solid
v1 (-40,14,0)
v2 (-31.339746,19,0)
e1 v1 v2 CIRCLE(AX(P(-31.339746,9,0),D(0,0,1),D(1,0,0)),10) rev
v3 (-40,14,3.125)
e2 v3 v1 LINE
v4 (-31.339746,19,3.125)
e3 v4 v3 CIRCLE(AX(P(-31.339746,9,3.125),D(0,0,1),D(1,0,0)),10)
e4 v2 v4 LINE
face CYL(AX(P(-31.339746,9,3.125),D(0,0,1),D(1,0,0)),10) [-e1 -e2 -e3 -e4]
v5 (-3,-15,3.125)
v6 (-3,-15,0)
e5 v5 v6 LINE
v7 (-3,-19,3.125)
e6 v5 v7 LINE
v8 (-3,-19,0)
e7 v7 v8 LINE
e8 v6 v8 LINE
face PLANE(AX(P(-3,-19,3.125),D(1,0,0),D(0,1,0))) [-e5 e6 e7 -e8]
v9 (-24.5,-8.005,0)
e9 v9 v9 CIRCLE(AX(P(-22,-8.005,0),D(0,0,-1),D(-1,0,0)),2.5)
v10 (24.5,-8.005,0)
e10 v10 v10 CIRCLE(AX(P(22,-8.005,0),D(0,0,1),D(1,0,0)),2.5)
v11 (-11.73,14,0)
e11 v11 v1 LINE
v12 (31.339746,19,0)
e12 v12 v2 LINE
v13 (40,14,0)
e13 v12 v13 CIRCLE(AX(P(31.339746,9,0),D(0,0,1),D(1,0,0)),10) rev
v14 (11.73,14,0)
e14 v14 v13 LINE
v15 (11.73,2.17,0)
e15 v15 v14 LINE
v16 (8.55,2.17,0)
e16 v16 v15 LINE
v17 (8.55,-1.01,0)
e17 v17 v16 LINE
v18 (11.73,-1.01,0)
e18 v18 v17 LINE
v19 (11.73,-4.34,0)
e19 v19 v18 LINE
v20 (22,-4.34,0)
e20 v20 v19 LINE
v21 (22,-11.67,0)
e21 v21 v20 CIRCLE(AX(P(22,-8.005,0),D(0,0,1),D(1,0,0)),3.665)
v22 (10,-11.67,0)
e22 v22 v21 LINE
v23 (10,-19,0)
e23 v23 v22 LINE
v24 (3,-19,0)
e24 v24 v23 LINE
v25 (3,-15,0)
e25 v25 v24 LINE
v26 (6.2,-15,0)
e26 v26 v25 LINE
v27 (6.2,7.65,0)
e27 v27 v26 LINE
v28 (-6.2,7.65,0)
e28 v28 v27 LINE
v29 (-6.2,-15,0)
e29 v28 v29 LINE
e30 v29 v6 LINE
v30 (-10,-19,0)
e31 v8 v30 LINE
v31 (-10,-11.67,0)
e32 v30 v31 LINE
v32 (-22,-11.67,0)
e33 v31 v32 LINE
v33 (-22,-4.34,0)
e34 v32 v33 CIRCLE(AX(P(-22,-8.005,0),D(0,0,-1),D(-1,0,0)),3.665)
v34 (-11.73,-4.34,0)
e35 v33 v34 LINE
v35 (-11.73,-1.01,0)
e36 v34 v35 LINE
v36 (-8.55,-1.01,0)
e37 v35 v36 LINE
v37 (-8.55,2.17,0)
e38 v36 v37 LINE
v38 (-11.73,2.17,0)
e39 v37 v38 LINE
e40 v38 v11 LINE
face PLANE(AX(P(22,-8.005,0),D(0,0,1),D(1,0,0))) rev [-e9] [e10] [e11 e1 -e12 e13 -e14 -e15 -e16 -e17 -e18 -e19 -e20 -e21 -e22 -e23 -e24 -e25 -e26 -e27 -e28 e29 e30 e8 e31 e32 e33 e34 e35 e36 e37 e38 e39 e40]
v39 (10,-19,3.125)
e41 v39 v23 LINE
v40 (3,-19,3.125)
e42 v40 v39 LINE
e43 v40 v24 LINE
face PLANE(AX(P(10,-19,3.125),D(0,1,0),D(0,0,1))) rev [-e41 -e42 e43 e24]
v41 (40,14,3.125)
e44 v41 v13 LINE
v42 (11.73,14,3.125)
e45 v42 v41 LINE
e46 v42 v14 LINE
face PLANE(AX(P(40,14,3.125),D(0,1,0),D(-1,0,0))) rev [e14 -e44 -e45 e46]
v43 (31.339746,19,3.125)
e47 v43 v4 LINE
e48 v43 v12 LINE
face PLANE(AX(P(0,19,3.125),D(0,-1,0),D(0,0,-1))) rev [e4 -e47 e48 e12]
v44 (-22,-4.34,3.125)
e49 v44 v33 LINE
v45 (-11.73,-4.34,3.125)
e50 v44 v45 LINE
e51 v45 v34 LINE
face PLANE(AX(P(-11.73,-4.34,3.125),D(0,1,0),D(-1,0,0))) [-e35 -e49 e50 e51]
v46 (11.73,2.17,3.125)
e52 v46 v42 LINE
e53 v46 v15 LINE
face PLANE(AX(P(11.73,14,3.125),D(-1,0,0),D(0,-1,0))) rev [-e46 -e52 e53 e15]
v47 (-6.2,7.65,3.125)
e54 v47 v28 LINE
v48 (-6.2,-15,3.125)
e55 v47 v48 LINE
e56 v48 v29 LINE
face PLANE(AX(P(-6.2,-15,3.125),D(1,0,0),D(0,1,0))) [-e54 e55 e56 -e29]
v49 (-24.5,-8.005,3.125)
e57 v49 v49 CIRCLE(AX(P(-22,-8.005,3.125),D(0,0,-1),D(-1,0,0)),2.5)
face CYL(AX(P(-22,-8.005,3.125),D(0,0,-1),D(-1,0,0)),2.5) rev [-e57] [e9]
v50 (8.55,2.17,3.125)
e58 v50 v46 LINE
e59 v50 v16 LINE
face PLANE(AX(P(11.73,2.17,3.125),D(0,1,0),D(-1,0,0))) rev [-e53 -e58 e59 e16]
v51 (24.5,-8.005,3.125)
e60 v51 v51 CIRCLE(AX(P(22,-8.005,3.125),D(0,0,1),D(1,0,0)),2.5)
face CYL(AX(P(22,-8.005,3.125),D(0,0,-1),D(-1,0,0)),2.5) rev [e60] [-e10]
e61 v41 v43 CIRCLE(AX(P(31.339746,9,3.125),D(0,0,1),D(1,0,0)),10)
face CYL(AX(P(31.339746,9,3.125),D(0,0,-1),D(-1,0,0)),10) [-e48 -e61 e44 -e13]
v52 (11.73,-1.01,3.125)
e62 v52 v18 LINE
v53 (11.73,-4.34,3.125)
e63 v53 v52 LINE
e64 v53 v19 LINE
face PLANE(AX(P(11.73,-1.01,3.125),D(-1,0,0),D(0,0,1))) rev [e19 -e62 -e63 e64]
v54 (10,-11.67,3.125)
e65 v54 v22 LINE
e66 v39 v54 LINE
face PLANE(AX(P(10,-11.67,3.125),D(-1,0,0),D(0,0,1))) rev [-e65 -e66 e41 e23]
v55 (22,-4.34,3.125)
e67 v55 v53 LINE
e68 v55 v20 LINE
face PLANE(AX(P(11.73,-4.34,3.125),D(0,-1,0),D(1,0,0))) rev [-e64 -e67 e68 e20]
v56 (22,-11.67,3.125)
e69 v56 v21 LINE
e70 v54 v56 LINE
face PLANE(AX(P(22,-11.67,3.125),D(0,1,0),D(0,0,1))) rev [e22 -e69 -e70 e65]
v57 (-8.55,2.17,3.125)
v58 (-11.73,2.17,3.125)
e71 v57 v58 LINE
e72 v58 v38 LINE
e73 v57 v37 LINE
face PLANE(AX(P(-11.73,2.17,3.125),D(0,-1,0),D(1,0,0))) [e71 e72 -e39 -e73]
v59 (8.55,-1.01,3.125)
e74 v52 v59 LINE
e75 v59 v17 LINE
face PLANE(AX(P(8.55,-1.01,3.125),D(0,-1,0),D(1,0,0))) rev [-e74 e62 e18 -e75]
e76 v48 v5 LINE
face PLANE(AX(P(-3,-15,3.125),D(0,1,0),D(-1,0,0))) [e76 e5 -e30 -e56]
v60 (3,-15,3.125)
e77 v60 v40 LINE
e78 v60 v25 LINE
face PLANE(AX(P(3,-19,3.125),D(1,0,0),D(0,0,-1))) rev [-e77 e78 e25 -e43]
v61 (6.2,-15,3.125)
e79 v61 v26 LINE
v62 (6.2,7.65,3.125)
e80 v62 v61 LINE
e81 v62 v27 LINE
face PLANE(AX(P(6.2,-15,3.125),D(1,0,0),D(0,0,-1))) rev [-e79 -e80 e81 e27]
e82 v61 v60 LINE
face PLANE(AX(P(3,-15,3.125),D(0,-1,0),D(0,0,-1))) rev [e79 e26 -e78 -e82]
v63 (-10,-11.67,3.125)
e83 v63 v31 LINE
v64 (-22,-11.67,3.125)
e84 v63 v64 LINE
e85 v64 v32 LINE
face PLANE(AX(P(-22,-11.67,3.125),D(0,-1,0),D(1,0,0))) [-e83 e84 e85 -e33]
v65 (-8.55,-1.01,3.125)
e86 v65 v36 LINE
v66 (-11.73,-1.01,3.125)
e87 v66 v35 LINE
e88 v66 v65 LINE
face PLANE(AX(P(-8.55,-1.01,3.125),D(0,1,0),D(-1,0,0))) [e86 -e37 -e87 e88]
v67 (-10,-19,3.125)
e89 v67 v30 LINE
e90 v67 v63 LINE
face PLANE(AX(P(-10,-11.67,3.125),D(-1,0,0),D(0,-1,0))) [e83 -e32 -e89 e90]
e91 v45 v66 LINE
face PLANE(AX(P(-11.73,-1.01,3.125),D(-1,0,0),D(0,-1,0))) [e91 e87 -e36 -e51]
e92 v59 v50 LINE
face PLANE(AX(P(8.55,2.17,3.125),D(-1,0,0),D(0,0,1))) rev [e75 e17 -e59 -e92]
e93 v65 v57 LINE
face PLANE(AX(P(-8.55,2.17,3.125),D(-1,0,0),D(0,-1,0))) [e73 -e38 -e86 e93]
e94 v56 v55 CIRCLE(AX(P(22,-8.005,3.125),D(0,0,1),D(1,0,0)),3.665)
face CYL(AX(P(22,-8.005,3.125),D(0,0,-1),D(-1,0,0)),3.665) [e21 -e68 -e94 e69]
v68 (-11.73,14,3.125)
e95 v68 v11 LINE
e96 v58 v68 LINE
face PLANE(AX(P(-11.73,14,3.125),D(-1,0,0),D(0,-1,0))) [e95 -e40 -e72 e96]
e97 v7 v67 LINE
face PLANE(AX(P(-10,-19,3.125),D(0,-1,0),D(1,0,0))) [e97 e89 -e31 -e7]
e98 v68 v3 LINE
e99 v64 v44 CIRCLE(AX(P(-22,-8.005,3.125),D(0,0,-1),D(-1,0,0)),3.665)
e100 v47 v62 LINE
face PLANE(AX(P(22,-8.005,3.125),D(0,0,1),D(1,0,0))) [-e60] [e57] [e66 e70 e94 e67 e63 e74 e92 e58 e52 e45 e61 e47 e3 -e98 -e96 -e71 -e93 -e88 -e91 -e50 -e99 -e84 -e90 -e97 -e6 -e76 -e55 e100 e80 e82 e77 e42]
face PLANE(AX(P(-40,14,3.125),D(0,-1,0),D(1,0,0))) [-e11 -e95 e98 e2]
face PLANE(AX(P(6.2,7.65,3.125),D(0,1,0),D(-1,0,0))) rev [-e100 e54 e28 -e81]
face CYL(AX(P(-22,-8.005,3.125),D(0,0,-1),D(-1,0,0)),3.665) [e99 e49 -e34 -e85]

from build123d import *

# Parameters (mm, degrees)
SKETCH1_R           = 2.5
BOSS_EXTRUDE1_DEPTH = 3.125
FILLET1_R           = 10


with BuildPart() as part:
    # Sketch1 → Boss-Extrude1 (new body)
    with BuildSketch(Plane.XY):
        with BuildLine():
            Line((0, 19), (40, 19))
            Line((40, 19), (40, 14))
            Line((40, 14), (11.73, 14))
            Line((11.73, 14), (11.73, 2.17))
            Line((11.73, 2.17), (8.55, 2.17))
            Line((8.55, 2.17), (8.55, -1.01))
            Line((8.55, -1.01), (11.73, -1.01))
            Line((11.73, -1.01), (11.73, -4.34))
            Line((11.73, -4.34), (22, -4.34))
            ThreePointArc((22, -4.34), (25.665, -8.005), (22, -11.67))
            Line((22, -11.67), (10, -11.67))
            Line((10, -11.67), (10, -19))
            Line((10, -19), (3, -19))
            Line((3, -19), (3, -15))
            Line((3, -15), (6.2, -15))
            Line((6.2, -15), (6.2, 7.65))
            Line((6.2, 7.65), (0, 7.65))
            Line((0, 7.65), (0, 19))
        make_face()
        with Locations((22, -8.005)):
            Circle(SKETCH1_R, mode=Mode.SUBTRACT)
    boss_extrude1 = extrude(amount=BOSS_EXTRUDE1_DEPTH)

    # Mirror1: Boss-Extrude1 across plane
    add(boss_extrude1.mirror(Plane(origin=(0, 19, 3.125), x_dir=(0, 0, 1), z_dir=(1, 0, 0))))

    # Fillet1
    # the kernel refuses this fillet: 10 mm, written as the material it takes off along each edge
    with BuildSketch(Plane(origin=(-40, 19, -21.650635095), x_dir=(1, 0, 0), z_dir=(0, 0, 1))) as fillet1_piece_1:
        with BuildLine():
            CenterArc((8.660254038, -10), FILLET1_R, 90, 60)
            Line((0, -5), (-0.173205081, -4.9))
            ThreePointArc((-0.173205081, -4.9), (-0.2, -2.5), (-0.2, 0))
            Line((-0.2, 0), (0, 0.2))
            Line((0, 0.2), (8.660254038, 0.2))
            Line((8.660254038, 0.2), (8.660254038, 0))
        make_face()
    extrude(amount=46.426270189, mode=Mode.SUBTRACT)
    with BuildSketch(Plane(origin=(40, 19, -21.650635095), x_dir=(-1, 0, 0), z_dir=(0, 0, 1))) as fillet1_piece_2:
        with BuildLine():
            CenterArc((8.660254038, 10), FILLET1_R, 210, 60)
            Line((0, 5), (-0.173205081, 4.9))
            ThreePointArc((-0.173205081, 4.9), (-0.2, 2.5), (-0.2, 0))
            Line((-0.2, 0), (0, -0.2))
            Line((0, -0.2), (8.660254038, -0.2))
            Line((8.660254038, -0.2), (8.660254038, 0))
        make_face()
    extrude(amount=46.426270189, mode=Mode.SUBTRACT)


solid = part.part
